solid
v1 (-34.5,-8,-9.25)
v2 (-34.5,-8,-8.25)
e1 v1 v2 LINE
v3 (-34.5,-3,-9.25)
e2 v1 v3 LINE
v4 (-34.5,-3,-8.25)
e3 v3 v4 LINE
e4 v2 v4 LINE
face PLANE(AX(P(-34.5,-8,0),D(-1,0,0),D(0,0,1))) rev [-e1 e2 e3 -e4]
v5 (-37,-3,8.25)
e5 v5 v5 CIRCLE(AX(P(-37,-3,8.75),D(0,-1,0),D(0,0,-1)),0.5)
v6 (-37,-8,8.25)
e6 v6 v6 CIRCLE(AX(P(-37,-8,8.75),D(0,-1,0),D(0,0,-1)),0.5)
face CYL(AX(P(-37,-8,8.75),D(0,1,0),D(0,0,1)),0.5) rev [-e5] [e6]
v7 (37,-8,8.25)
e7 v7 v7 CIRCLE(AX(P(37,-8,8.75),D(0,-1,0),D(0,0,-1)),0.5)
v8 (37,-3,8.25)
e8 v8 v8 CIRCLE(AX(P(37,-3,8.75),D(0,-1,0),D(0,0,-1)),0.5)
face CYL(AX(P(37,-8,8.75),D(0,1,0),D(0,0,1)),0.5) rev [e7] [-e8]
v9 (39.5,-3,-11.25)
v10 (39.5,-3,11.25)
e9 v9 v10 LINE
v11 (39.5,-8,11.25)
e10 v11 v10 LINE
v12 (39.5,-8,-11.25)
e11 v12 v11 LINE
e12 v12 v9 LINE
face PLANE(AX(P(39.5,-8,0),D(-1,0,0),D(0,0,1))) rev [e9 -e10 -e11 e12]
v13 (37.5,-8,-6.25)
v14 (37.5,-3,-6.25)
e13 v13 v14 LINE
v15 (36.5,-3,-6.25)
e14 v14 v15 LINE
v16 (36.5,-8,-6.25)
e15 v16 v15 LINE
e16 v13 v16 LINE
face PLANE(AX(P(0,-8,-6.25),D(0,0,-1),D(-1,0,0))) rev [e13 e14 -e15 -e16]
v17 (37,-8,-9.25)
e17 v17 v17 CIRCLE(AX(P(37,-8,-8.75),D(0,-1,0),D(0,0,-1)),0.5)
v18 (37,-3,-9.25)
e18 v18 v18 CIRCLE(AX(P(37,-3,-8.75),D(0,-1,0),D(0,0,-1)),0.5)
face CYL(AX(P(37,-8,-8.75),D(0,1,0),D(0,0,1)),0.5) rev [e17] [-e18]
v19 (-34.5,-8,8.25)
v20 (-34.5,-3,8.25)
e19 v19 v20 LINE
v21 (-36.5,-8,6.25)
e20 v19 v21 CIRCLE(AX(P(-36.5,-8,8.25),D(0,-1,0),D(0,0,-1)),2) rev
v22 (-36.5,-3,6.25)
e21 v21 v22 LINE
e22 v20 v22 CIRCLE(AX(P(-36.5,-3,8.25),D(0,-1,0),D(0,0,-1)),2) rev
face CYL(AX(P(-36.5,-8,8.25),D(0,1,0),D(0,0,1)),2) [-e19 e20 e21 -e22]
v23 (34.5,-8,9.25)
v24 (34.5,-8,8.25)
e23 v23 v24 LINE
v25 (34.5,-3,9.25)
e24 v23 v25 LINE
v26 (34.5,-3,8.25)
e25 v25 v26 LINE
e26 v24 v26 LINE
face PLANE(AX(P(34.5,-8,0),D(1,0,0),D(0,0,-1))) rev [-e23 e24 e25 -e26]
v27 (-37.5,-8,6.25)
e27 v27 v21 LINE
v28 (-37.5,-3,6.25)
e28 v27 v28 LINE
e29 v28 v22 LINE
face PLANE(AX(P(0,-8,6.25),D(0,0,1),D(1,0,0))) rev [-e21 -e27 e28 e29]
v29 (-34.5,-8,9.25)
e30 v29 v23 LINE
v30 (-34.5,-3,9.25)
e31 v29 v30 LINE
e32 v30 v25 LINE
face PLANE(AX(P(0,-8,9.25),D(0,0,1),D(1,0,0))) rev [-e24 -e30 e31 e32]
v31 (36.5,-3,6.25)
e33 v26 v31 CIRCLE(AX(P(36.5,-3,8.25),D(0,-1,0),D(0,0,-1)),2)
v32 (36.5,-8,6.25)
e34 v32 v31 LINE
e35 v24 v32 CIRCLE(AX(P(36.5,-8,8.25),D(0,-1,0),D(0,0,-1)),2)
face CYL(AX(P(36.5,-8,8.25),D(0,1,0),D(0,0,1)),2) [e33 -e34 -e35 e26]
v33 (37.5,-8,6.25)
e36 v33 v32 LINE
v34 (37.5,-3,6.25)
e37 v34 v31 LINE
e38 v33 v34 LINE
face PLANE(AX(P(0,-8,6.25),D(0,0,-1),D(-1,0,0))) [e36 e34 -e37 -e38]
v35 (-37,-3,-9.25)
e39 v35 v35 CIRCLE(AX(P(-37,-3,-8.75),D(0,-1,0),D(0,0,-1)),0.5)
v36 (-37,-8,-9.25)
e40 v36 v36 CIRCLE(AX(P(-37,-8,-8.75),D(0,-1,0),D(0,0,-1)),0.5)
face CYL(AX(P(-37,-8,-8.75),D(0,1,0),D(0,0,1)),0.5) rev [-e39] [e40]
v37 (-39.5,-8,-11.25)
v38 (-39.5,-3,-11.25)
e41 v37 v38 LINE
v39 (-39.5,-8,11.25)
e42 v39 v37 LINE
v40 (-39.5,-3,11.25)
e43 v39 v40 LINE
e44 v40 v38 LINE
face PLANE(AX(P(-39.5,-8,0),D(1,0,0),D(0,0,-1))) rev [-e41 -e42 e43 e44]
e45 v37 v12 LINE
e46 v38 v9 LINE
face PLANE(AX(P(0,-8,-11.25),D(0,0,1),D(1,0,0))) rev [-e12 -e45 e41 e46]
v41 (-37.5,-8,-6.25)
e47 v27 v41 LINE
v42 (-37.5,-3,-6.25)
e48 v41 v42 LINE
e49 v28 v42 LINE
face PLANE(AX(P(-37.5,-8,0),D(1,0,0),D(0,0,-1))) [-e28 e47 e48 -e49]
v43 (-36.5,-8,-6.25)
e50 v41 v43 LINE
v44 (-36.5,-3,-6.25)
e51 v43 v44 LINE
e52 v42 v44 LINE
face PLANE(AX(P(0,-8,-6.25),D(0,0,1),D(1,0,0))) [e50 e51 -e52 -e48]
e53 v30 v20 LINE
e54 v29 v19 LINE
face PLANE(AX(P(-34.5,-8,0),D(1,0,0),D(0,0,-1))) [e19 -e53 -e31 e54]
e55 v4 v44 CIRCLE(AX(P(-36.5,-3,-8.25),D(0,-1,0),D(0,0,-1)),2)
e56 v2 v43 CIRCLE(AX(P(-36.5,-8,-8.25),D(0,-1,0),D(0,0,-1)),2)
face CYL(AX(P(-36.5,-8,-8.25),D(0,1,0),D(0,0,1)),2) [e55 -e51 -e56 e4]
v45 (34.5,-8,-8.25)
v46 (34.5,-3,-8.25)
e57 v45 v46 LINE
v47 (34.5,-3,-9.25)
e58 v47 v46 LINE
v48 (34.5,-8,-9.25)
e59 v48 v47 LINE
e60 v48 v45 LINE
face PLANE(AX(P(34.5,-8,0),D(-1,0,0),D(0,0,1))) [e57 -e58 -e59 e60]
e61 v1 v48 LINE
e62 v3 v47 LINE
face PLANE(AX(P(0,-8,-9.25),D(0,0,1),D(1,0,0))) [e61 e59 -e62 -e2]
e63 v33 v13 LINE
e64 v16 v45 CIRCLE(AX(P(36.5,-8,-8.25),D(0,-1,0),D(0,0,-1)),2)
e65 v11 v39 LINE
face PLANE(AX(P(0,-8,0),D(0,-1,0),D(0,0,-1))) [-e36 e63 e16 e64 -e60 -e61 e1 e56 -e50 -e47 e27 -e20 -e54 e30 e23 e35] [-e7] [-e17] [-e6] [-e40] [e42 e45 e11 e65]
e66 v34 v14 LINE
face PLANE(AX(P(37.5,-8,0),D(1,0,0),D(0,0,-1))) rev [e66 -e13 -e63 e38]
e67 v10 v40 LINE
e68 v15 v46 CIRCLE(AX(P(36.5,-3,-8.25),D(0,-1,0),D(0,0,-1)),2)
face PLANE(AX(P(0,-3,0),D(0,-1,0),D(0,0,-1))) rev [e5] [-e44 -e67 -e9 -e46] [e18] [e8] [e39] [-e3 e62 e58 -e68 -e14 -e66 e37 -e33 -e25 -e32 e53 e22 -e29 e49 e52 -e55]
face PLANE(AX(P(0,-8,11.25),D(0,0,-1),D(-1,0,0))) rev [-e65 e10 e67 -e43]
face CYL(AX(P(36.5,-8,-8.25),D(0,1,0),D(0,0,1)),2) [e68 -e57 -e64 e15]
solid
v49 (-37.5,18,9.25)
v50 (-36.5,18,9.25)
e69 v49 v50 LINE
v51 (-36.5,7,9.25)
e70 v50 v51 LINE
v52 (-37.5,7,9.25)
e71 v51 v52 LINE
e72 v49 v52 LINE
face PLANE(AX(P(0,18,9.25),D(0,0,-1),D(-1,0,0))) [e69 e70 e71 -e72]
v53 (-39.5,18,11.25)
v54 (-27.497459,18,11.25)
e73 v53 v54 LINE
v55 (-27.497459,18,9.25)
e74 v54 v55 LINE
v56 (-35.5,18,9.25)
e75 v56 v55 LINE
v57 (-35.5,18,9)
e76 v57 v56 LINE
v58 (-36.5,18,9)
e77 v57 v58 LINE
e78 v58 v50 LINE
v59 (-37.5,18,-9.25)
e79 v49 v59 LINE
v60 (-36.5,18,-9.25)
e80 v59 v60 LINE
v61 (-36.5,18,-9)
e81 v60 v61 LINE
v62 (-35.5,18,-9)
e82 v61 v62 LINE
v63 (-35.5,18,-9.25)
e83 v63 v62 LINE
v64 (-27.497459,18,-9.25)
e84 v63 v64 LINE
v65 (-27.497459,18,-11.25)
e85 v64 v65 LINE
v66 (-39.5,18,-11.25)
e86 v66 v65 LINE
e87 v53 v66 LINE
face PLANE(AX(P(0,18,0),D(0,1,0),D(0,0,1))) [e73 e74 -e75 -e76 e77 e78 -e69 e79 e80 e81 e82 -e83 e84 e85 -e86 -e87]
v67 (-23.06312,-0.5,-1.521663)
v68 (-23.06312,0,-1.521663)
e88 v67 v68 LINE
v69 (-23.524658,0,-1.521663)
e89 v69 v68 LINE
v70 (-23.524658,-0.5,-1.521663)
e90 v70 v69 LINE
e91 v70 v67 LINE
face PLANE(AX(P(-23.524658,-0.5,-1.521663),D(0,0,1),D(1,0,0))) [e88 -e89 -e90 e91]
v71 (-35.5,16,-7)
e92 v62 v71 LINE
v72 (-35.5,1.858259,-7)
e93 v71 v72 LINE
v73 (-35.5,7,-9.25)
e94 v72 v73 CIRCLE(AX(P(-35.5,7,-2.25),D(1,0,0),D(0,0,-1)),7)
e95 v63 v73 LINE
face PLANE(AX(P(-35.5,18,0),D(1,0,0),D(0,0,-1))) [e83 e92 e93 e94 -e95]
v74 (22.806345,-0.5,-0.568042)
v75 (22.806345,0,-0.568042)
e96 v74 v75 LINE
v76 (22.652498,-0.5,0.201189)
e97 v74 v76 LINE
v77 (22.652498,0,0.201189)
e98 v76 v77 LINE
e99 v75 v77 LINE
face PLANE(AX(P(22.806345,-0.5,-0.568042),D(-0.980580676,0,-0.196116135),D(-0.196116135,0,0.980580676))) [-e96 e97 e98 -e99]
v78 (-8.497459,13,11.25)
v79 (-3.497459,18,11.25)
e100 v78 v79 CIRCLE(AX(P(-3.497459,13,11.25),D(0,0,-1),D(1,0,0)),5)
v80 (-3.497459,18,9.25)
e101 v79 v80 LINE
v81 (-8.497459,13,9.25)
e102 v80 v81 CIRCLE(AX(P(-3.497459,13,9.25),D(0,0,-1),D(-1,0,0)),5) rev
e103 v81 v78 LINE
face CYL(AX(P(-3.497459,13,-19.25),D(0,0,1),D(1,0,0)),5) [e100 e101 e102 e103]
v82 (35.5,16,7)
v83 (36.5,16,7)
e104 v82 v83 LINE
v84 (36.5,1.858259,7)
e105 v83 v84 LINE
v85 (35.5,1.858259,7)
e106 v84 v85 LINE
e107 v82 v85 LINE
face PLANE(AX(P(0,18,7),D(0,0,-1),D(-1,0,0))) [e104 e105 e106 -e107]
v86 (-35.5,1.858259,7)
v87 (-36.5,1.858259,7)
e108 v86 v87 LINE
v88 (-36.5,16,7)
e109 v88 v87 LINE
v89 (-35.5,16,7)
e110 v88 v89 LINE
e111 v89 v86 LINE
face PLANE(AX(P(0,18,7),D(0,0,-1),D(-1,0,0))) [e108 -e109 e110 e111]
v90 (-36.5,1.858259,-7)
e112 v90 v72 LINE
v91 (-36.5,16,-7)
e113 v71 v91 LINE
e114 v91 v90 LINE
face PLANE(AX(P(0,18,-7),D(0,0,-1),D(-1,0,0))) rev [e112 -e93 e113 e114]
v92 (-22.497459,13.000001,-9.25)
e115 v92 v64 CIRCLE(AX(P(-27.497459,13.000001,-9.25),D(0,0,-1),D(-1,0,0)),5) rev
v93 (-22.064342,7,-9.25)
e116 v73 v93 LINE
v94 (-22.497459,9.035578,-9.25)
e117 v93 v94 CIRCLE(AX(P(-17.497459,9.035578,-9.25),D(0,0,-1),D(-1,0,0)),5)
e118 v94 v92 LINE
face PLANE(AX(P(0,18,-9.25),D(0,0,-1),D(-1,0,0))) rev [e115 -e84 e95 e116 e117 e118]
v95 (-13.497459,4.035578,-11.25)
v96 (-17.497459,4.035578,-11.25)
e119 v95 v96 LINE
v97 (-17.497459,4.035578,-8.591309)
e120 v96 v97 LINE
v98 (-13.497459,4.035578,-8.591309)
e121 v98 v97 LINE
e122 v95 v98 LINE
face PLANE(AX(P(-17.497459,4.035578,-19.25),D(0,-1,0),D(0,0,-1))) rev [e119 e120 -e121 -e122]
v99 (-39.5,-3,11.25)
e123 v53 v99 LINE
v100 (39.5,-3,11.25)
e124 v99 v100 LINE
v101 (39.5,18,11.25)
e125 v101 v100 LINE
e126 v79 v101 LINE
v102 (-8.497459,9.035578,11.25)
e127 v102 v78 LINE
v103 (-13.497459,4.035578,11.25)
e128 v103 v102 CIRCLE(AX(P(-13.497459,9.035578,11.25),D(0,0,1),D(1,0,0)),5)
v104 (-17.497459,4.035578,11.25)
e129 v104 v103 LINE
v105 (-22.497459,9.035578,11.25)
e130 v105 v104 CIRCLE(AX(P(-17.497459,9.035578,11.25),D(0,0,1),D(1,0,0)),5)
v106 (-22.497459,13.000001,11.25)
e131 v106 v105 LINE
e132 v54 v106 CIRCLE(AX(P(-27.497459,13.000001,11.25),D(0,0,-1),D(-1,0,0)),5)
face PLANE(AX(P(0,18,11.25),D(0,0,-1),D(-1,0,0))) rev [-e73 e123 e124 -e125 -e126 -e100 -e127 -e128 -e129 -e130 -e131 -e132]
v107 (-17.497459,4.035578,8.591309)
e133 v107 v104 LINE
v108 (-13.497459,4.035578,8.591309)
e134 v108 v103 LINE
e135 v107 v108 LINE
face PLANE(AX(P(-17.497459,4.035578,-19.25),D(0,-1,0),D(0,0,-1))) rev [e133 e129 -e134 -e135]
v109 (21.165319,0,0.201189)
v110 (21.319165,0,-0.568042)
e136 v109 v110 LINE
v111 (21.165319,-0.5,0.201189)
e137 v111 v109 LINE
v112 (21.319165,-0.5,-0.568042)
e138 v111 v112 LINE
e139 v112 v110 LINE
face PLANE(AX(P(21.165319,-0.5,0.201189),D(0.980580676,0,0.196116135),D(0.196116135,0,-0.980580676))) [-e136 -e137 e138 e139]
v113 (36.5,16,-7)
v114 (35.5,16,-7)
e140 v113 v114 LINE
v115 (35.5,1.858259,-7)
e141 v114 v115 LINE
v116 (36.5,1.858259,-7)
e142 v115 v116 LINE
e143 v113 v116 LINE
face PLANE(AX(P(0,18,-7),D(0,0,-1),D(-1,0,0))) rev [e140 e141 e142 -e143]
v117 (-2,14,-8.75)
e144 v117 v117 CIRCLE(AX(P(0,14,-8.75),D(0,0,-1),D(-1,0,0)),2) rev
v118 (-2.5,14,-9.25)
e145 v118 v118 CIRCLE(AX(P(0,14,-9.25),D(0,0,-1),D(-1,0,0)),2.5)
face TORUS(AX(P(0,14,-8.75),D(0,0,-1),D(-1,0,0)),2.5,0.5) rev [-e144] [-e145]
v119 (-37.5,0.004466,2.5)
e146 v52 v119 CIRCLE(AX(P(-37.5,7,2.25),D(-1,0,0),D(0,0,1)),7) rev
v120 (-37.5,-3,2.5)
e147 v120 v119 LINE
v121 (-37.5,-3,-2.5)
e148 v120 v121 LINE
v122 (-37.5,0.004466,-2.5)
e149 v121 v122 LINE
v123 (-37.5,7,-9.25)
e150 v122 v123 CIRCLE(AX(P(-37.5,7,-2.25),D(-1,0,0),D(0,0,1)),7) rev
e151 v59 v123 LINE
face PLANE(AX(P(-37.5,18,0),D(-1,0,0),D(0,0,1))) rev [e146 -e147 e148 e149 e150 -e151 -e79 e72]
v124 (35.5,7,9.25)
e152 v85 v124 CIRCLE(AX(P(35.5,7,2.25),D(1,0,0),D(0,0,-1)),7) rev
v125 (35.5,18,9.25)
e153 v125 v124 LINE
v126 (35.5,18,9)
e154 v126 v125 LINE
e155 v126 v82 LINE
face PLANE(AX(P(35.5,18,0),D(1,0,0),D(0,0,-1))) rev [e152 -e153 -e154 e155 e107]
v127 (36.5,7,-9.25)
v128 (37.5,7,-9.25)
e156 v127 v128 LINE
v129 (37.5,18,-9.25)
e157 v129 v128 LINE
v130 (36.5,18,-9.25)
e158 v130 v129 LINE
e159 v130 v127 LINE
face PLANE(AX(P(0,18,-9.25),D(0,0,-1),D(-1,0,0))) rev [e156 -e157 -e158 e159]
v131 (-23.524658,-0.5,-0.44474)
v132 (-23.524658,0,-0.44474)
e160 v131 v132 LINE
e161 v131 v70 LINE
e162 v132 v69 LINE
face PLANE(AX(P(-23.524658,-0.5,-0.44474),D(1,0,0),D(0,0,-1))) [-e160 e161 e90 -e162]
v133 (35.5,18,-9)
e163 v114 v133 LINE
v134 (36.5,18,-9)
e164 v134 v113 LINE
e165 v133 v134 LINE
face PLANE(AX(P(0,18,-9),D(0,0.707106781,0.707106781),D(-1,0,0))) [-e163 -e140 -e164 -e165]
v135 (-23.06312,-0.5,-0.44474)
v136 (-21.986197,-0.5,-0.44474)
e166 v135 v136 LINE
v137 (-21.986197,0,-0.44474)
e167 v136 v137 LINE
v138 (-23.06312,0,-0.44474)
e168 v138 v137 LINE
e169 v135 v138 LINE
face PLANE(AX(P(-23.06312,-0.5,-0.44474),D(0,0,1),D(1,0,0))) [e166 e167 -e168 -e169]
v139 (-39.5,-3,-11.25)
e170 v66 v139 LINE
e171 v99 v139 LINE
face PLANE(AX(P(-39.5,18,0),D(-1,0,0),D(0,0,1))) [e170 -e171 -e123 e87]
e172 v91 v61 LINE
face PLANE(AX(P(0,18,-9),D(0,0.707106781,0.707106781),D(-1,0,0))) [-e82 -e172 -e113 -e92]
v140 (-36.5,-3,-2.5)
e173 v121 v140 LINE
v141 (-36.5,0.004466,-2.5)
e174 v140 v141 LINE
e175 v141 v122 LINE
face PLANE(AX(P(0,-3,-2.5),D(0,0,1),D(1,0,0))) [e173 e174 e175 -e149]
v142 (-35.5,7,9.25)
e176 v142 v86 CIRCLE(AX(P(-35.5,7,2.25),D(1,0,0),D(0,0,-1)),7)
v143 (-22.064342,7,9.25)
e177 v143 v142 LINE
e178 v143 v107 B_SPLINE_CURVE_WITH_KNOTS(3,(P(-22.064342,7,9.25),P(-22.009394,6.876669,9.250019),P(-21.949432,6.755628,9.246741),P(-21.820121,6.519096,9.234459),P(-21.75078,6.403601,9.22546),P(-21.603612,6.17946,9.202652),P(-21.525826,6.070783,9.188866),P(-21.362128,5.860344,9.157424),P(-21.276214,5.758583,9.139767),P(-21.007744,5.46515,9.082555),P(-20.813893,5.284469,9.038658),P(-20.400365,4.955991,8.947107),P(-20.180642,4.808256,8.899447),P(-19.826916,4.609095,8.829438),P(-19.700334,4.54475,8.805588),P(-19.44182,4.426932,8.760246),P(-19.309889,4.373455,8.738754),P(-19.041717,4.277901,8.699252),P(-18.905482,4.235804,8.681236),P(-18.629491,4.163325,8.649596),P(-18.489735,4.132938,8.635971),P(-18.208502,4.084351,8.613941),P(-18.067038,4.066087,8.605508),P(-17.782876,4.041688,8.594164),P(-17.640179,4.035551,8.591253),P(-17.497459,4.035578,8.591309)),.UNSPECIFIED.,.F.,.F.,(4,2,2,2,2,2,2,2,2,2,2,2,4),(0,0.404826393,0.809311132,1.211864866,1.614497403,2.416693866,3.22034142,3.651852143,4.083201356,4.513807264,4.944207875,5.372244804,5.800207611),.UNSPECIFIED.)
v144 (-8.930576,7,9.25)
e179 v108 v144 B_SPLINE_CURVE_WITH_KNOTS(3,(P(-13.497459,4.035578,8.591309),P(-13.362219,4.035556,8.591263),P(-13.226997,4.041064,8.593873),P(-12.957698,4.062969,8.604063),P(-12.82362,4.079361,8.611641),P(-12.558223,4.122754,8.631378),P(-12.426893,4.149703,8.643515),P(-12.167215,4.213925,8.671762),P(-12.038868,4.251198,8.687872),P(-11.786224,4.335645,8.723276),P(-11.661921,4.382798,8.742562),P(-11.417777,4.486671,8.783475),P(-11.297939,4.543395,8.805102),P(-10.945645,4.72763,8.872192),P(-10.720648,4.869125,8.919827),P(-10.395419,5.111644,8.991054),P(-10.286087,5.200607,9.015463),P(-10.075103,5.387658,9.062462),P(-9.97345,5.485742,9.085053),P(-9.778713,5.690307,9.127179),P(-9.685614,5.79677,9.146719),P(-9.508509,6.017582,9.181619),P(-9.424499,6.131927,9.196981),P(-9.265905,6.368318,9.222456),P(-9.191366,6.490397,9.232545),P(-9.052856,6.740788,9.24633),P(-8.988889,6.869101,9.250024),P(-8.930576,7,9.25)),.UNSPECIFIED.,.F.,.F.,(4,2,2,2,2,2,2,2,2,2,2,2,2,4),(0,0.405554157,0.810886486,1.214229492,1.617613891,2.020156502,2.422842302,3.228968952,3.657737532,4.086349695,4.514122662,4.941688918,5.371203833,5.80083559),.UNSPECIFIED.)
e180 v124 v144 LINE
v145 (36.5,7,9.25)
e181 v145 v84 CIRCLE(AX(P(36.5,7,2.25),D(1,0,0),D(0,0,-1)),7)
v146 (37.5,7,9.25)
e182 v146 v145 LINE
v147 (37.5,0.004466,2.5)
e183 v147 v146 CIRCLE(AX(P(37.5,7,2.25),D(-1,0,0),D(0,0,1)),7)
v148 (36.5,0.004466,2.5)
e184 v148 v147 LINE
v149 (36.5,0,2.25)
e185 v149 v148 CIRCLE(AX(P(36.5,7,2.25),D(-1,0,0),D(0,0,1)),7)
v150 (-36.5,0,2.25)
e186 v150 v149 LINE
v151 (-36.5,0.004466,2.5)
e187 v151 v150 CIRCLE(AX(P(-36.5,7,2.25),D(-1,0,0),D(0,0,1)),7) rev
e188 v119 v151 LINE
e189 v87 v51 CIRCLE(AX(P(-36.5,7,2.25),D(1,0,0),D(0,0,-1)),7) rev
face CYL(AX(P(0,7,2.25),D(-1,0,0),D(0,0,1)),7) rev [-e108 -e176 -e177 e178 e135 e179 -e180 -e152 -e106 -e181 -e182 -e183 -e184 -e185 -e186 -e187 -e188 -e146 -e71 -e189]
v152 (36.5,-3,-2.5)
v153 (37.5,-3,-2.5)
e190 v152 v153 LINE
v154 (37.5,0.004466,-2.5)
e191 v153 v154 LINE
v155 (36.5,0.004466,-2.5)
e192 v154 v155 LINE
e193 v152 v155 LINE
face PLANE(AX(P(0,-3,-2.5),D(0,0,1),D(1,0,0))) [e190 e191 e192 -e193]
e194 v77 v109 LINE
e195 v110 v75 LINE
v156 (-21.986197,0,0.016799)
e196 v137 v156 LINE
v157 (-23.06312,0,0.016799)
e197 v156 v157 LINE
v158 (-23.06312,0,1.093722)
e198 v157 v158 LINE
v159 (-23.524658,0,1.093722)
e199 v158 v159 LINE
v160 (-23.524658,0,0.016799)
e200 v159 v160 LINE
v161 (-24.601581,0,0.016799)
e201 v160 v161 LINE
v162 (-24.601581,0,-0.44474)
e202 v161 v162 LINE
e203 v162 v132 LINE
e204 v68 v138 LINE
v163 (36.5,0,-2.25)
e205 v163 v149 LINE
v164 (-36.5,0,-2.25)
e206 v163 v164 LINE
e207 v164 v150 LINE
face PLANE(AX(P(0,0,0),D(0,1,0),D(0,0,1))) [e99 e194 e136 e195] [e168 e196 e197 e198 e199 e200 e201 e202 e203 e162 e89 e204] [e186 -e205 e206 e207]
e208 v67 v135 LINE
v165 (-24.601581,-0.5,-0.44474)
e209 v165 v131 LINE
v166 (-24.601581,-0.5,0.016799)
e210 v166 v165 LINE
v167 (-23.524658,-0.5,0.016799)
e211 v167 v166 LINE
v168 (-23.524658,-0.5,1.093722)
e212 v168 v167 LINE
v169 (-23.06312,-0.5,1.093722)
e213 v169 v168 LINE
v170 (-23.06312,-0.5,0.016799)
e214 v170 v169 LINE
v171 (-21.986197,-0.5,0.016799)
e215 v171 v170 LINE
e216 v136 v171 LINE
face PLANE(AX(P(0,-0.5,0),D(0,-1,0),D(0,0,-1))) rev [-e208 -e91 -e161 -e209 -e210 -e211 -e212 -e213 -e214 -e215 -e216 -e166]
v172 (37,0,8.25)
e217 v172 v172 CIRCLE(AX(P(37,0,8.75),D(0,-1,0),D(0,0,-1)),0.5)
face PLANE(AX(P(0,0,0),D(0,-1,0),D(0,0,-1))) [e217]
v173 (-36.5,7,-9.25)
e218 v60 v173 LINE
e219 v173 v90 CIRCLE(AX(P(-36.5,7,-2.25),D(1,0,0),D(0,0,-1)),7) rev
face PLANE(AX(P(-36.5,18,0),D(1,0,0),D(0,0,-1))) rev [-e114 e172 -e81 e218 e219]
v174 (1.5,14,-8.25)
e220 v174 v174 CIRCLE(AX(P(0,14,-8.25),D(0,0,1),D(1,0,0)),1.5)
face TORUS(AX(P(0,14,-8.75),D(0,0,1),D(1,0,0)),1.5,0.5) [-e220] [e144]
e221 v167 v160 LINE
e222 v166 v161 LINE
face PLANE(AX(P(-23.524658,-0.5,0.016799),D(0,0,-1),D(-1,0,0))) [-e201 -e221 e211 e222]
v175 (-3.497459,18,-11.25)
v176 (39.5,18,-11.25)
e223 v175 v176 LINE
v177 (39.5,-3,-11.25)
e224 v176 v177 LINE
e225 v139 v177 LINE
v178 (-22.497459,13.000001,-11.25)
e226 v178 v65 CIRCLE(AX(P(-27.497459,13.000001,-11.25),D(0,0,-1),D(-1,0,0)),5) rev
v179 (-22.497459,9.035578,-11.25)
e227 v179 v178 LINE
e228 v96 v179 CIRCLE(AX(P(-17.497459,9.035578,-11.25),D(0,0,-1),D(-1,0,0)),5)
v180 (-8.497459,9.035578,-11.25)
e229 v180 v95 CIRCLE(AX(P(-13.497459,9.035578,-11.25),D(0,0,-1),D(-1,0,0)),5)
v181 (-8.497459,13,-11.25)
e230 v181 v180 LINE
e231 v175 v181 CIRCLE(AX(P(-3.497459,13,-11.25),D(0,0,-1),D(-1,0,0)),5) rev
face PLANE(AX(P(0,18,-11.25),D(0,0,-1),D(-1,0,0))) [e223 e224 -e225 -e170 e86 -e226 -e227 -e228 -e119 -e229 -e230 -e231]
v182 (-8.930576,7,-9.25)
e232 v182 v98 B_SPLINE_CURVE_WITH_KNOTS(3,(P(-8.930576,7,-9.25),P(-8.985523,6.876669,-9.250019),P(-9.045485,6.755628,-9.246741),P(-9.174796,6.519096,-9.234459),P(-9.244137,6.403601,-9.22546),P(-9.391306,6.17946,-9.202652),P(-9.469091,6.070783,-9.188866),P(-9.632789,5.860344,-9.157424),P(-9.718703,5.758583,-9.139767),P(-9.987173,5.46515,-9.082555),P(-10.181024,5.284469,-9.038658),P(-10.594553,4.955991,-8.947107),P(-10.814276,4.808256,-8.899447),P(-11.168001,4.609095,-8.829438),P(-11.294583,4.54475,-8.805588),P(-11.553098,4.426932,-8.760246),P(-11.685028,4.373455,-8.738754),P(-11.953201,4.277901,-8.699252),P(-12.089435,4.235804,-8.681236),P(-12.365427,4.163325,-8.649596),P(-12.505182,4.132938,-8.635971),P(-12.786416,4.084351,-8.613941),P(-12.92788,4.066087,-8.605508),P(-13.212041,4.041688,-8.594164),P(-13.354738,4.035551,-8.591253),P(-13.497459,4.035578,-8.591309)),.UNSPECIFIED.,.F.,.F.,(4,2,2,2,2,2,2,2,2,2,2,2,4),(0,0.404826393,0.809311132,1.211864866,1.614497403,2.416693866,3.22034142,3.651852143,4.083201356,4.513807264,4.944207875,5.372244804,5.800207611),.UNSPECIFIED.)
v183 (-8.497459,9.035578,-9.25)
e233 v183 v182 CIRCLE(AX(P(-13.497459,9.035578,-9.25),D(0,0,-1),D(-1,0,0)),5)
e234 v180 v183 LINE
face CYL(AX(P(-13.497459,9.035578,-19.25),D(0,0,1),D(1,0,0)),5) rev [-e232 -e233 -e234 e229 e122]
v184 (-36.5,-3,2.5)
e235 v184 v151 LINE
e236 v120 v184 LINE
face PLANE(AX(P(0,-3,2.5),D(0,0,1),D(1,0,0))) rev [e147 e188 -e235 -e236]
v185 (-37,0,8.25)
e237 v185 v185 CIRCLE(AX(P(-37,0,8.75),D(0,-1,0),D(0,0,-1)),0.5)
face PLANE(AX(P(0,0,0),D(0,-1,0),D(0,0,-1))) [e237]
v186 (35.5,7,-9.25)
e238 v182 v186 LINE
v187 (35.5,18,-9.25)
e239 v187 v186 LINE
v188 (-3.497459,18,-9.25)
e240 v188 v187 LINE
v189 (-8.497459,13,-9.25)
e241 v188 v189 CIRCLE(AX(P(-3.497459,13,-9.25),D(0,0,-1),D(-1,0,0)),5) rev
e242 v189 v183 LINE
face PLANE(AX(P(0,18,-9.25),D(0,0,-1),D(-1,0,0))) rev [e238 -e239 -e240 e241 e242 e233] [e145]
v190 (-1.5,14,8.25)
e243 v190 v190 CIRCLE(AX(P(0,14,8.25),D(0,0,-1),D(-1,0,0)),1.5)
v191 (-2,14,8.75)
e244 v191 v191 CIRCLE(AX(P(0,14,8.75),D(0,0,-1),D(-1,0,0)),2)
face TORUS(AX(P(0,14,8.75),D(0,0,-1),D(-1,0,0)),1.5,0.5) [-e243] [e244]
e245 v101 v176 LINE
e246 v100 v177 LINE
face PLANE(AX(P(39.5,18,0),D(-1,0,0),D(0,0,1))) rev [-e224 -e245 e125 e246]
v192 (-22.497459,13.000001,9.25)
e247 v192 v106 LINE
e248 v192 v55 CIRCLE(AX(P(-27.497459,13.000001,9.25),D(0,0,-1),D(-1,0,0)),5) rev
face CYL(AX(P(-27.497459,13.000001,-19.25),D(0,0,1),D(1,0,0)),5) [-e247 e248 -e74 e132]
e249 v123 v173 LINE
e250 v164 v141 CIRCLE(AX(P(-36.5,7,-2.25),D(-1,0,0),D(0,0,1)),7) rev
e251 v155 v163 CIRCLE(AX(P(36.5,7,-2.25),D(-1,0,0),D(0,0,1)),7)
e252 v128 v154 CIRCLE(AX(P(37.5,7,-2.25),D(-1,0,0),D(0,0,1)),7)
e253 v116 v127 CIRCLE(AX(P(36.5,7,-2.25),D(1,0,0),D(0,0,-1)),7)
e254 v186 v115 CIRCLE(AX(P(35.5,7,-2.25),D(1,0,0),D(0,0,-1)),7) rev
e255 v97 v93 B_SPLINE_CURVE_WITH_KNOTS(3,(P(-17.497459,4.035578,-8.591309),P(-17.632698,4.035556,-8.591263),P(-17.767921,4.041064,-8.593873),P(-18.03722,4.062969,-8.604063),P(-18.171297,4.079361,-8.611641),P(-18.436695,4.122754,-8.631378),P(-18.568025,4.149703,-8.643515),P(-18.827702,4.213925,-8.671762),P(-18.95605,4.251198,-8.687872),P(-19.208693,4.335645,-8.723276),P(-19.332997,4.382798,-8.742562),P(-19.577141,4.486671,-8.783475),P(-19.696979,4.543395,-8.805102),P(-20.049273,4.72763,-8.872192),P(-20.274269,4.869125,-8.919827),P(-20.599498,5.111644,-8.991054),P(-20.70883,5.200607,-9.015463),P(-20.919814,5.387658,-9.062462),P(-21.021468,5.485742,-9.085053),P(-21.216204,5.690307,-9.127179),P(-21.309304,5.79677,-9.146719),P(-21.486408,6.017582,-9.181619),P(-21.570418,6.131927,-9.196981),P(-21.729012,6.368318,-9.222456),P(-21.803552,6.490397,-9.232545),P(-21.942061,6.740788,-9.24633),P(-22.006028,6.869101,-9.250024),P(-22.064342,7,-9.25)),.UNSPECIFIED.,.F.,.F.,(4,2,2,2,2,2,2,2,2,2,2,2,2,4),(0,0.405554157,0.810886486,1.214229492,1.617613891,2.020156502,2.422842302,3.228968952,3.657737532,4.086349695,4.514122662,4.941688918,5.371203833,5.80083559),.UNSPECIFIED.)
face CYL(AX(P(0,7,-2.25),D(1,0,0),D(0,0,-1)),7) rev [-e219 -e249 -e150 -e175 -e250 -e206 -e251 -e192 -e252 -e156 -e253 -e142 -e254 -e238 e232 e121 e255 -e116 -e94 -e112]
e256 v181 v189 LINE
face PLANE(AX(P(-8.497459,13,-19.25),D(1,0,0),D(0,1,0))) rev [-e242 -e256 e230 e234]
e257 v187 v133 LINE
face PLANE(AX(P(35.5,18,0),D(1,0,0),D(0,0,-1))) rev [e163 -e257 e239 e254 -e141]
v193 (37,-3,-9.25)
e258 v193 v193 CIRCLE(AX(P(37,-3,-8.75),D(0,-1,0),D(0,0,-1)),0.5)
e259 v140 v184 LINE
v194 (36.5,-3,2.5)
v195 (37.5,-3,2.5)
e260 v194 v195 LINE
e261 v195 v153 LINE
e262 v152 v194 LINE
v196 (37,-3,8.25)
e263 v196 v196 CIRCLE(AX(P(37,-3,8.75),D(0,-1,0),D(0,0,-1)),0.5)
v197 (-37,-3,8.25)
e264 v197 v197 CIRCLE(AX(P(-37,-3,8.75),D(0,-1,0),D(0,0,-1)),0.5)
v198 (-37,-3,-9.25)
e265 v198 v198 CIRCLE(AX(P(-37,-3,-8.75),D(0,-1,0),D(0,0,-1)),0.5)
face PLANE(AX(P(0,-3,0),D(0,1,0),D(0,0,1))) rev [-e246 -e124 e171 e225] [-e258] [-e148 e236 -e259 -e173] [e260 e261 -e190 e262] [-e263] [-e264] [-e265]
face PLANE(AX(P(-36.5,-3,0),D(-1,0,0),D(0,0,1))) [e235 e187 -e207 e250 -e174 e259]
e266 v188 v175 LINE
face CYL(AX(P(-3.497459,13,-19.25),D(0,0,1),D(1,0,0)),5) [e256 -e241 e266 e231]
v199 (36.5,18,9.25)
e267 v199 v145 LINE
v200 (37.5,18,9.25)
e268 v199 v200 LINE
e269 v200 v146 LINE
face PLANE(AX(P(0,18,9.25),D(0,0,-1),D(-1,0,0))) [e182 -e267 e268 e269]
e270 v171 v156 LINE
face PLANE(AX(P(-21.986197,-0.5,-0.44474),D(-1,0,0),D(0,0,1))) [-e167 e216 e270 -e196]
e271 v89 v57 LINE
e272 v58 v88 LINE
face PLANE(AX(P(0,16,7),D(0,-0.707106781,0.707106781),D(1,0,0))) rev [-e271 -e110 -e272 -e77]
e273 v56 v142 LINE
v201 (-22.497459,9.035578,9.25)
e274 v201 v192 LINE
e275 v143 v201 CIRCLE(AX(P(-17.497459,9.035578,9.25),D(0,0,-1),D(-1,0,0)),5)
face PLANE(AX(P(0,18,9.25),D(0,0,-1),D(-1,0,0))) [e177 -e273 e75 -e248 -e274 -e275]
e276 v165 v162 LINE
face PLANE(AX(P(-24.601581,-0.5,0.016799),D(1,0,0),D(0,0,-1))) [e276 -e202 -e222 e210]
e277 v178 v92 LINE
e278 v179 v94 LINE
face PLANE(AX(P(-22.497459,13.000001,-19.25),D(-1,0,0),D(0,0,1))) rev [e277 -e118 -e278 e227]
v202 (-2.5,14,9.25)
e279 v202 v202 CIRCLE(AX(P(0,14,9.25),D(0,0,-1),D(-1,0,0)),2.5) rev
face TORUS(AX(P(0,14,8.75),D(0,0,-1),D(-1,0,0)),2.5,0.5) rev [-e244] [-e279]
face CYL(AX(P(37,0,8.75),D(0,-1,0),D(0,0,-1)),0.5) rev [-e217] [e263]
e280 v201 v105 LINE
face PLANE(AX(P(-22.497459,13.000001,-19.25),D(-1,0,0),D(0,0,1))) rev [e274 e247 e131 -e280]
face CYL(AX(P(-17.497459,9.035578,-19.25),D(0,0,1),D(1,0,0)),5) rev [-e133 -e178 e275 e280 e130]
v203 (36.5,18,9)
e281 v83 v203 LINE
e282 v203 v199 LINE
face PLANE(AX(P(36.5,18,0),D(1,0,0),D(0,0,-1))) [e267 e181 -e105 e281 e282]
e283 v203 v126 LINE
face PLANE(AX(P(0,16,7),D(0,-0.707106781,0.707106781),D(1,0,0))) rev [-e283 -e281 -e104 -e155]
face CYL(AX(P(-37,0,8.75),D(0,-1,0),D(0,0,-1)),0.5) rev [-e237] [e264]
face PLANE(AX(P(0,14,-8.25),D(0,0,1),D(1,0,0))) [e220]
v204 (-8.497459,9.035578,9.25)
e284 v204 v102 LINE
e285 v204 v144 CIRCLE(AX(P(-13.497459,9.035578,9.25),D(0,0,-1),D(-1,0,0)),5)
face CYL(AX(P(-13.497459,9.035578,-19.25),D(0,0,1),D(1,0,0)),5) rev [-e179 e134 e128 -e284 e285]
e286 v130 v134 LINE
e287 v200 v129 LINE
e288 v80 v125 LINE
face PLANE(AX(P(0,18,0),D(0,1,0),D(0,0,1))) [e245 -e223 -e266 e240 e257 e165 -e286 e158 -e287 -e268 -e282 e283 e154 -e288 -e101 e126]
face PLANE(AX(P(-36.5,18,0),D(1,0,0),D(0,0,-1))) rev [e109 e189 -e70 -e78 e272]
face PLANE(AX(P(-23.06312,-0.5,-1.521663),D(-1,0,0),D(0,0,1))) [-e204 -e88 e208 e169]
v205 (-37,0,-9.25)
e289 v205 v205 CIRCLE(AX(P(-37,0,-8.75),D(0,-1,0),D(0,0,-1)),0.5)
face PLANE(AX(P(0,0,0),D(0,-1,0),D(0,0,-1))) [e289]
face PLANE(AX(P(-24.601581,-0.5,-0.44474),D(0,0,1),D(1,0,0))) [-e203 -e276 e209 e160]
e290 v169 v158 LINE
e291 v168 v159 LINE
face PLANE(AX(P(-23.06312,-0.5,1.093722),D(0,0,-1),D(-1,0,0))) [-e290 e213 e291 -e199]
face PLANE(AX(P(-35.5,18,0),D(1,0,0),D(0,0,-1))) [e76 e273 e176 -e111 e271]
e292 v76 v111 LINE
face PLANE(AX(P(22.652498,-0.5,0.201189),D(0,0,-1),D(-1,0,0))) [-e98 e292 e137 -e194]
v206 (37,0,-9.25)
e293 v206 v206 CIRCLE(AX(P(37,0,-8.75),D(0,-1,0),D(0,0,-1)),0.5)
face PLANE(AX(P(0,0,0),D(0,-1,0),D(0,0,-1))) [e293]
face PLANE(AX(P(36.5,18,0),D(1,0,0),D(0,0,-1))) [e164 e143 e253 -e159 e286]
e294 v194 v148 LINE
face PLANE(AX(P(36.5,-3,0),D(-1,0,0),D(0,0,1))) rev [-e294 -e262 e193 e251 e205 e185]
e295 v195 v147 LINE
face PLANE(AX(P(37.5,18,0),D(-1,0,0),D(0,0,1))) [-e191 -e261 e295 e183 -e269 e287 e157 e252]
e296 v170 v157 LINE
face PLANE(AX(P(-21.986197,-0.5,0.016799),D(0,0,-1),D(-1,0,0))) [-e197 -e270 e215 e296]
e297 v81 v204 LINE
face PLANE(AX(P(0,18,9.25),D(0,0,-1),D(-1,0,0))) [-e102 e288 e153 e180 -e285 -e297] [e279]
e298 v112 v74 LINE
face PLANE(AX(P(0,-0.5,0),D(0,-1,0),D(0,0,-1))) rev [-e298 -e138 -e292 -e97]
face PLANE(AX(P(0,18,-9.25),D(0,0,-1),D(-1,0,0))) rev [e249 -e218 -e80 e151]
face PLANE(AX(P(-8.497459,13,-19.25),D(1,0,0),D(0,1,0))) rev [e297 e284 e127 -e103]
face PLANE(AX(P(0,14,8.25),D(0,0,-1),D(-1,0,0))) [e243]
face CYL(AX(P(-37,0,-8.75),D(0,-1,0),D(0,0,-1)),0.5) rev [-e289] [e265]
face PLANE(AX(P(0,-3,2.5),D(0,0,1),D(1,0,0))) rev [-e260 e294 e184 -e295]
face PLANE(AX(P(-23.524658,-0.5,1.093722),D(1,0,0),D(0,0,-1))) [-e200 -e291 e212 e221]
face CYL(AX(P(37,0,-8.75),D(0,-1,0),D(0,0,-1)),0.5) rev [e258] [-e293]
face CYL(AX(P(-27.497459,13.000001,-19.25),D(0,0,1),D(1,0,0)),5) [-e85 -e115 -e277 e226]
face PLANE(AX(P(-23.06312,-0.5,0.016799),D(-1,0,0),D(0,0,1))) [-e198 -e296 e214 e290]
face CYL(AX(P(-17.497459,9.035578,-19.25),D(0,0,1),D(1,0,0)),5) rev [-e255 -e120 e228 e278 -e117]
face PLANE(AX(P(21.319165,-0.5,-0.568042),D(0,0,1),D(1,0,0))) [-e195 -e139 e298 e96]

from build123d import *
from OCP.BRepAlgoAPI import BRepAlgoAPI_Cut
from OCP.TopTools import TopTools_ListOfShape

# Parameters (mm, degrees)
SKETCH_1_W          = 79
SKETCH_1_H          = 22.5
SKETCH_1_W_2        = 75
SKETCH_1_H_2        = 18.5
SKETCH_1_W_3        = 1
SKETCH_1_H_3        = 2.25
EXTRUDE_1_DEPTH     = 18
SKETCH_1_4_W        = 79
SKETCH_1_4_H        = 22.5
SKETCH_1_4_W_2      = 75
SKETCH_1_4_H_2      = 18.5
SKETCH_1_4_W_3      = 1
SKETCH_1_4_H_3      = 2.25
EXTRUDE_2_DEPTH     = 3
FILLET_1_R          = 7
CUT_EXTRUDE_1_DEPTH = 0.5
CUT_EXTRUDE_2_DEPTH = 30.5
CHAMFER_1_SIZE      = 2
SKETCH_4_R          = 2
EXTRUDE_4_DEPTH     = 1
EXTRUDE_START       = 1
SKETCH_5_R          = 2
EXTRUDE_5_DEPTH     = 1
FILLET_3_R          = 0.5
SKETCH_6_R          = 0.5
SKETCH_6_W          = 69
SKETCH_6_H          = 2
EXTRUDE_6_DEPTH     = 5
SKETCH_6_3_R        = 0.5
CUT_EXTRUDE_3_DEPTH = 3


with BuildPart() as part:
    # Эскиз1 → Бобышка-Вытянуть1 (new body)
    # profile 1 of 5: a face of its own
    with BuildSketch(Plane(origin=(0, 0, 0), x_dir=(1, 0, 0), z_dir=(0, 1, 0))):
        Rectangle(SKETCH_1_W, SKETCH_1_H)
        Rectangle(SKETCH_1_W_2, SKETCH_1_H_2, mode=Mode.SUBTRACT)
    # profile 2 of 5: a face of its own
    with BuildSketch(Plane(origin=(0, 0, 0), x_dir=(1, 0, 0), z_dir=(0, 1, 0))):
        with Locations((-36, 8.125)):
            Rectangle(SKETCH_1_W_3, SKETCH_1_H_3)
    # profile 3 of 5: a face of its own
    with BuildSketch(Plane(origin=(0, 0, 0), x_dir=(1, 0, 0), z_dir=(0, 1, 0))):
        with Locations((-36, -8.125)):
            Rectangle(SKETCH_1_W_3, SKETCH_1_H_3)
    # profile 4 of 5: a face of its own
    with BuildSketch(Plane(origin=(0, 0, 0), x_dir=(1, 0, 0), z_dir=(0, 1, 0))):
        with Locations((36, 8.125)):
            Rectangle(SKETCH_1_W_3, SKETCH_1_H_3)
    # profile 5 of 5: a face of its own
    with BuildSketch(Plane(origin=(0, 0, 0), x_dir=(1, 0, 0), z_dir=(0, 1, 0))):
        with Locations((36, -8.125)):
            Rectangle(SKETCH_1_W_3, SKETCH_1_H_3)
    extrude(amount=EXTRUDE_1_DEPTH)

    # Эскиз1<4> → Бобышка-Вытянуть2 (add)
    # profile 1 of 6: a face of its own
    with BuildSketch(Plane(origin=(0, 0, 0), x_dir=(1, 0, 0), z_dir=(0, 1, 0))):
        Rectangle(SKETCH_1_4_W, SKETCH_1_4_H)
        Rectangle(SKETCH_1_4_W_2, SKETCH_1_4_H_2, mode=Mode.SUBTRACT)
    # profile 2 of 6: a face of its own
    with BuildSketch(Plane(origin=(0, 0, 0), x_dir=(1, 0, 0), z_dir=(0, 1, 0))):
        Polygon((37.5, 9.25), (36.5, 9.25), (36.5, 7), (35.5, 7), (35.5, 9.25), (-35.5, 9.25), (-35.5, 7), (-36.5, 7), (-36.5, 9.25), (-37.5, 9.25), (-37.5, 2.5), (-36.5, 2.5), (-36.5, -2.5), (-37.5, -2.5), (-37.5, -9.25), (-36.5, -9.25), (-36.5, -7), (-35.5, -7), (-35.5, -9.25), (35.5, -9.25), (35.5, -7), (36.5, -7), (36.5, -9.25), (37.5, -9.25), (37.5, -2.5), (36.5, -2.5), (36.5, 2.5), (37.5, 2.5), align=None)
    # profile 3 of 6: a face of its own
    with BuildSketch(Plane(origin=(0, 0, 0), x_dir=(1, 0, 0), z_dir=(0, 1, 0))):
        with Locations((-36, -8.125)):
            Rectangle(SKETCH_1_4_W_3, SKETCH_1_4_H_3)
    # profile 4 of 6: a face of its own
    with BuildSketch(Plane(origin=(0, 0, 0), x_dir=(1, 0, 0), z_dir=(0, 1, 0))):
        with Locations((-36, 8.125)):
            Rectangle(SKETCH_1_4_W_3, SKETCH_1_4_H_3)
    # profile 5 of 6: a face of its own
    with BuildSketch(Plane(origin=(0, 0, 0), x_dir=(1, 0, 0), z_dir=(0, 1, 0))):
        with Locations((36, -8.125)):
            Rectangle(SKETCH_1_4_W_3, SKETCH_1_4_H_3)
    # profile 6 of 6: a face of its own
    with BuildSketch(Plane(origin=(0, 0, 0), x_dir=(1, 0, 0), z_dir=(0, 1, 0))):
        with Locations((36, 8.125)):
            Rectangle(SKETCH_1_4_W_3, SKETCH_1_4_H_3)
    extrude(amount=-EXTRUDE_2_DEPTH)

    # Скругление1
    fillet_1_edges = [part.edges().sort_by_distance(p)[0] for p in [
        (0, 0, 9.25),
        (0, 0, -9.25),
    ]]
    fillet(fillet_1_edges, radius=FILLET_1_R)

    # Эскиз2 → Вырез-Вытянуть1 (cut)
    with BuildSketch(Plane(origin=(0, 0, 0), x_dir=(1, 0, 0), z_dir=(0, 1, 0))):
        Polygon((-23.524658225, -1.093721701), (-23.524658225, -0.016798624), (-24.601581301, -0.016798624), (-24.601581301, 0.444739838), (-23.524658225, 0.444739838), (-23.524658225, 1.521662915), (-23.063119763, 1.521662915), (-23.063119763, 0.444739838), (-21.986196686, 0.444739838), (-21.986196686, -0.016798624), (-23.063119763, -0.016798624), (-23.063119763, -1.093721701), align=None)
        Polygon((21.319165068, 0.568041922), (22.806344555, 0.568041922), (22.652498401, -0.201188847), (21.165318914, -0.201188847), align=None)
    extrude(amount=-CUT_EXTRUDE_1_DEPTH, mode=Mode.SUBTRACT)


with BuildPart() as cut_extrude_2_tool:
    # Эскиз3 → Вырез-Вытянуть2 (new body)
    with BuildSketch(Plane.XY.offset(11.25)):
        with BuildLine():
            Line((-21.5, 18), (-8.5, 18))
            Line((-8.5, 18), (-3.4974587, 18))
            ThreePointArc((-3.4974587, 18), (-7.032992606, 16.535533906), (-8.4974587, 13))
            Line((-8.4974587, 13), (-8.4974587, 9.035578202))
            ThreePointArc((-8.4974587, 9.035578202), (-9.961924794, 5.500044296), (-13.4974587, 4.035578202))
            Line((-13.4974587, 4.035578202), (-17.4974587, 4.035578202))
            ThreePointArc((-17.4974587, 4.035578202), (-21.032992606, 5.500044296), (-22.4974587, 9.035578202))
            Line((-22.4974587, 9.035578202), (-22.4974587, 13.000000646))
            ThreePointArc((-22.4974587, 13.000000646), (-23.962823393, 16.536432923), (-27.5, 18))
            Line((-27.5, 18), (-21.5, 18))
        make_face()
    extrude(amount=-CUT_EXTRUDE_2_DEPTH)


with BuildPart() as part_1:
    add(part.part)

    # Вырез-Вытянуть2: cut by cut_extrude_2_tool, with a tolerance
    cut_extrude_2_stock = TopTools_ListOfShape()
    cut_extrude_2_stock.Append(part_1.part.wrapped)
    cut_extrude_2_tools = TopTools_ListOfShape()
    cut_extrude_2_tools.Append(cut_extrude_2_tool.part.wrapped)
    cut_extrude_2_cut = BRepAlgoAPI_Cut()
    cut_extrude_2_cut.SetArguments(cut_extrude_2_stock)
    cut_extrude_2_cut.SetTools(cut_extrude_2_tools)
    cut_extrude_2_cut.SetFuzzyValue(0.00001)
    cut_extrude_2_cut.Build()
    add(Compound.cast(cut_extrude_2_cut.Shape()).solids(), mode=Mode.REPLACE)

    # Фаска1
    chamfer_1_edges = [part_1.edges().sort_by_distance(p)[0] for p in [
        (36, 18, -7),
        (36, 18, 7),
        (-36, 18, 7),
        (-36, 18, -7),
    ]]
    chamfer(chamfer_1_edges, length=CHAMFER_1_SIZE)

    # Эскиз4 → Бобышка-Вытянуть4 (add)
    with BuildSketch(Plane(origin=(0, 0, 9.25), x_dir=(-1, 0, 0), z_dir=(0, 0, -1))):
        with Locations((0, 14)):
            Circle(SKETCH_4_R)
    extrude(amount=EXTRUDE_4_DEPTH)

    # Эскиз5 → Бобышка-Вытянуть5 (add)
    with BuildSketch(Plane.XY.offset(-9.25).offset(EXTRUDE_START)):
        with Locations(Location((0, 14, 0), (0, 0, 180))):
            Circle(SKETCH_5_R)
    extrude(amount=-EXTRUDE_5_DEPTH)

    # Скругление3
    fillet_3_edges = [part_1.edges().sort_by_distance(p)[0] for p in [
        (2, 14, 9.25),
        (2, 14, 8.25),
        (2, 14, -9.25),
        (2, 14, -8.25),
    ]]
    fillet(fillet_3_edges, radius=FILLET_3_R - 0.0001)  # a hair under: the kernel refuses the full size

    # Эскиз6<3> → Вырез-Вытянуть3 (cut)
    with BuildSketch(Plane.XZ.offset(3)):
        with Locations(Location((-37, -8.75, 0), (0, 0, 270))):
            Circle(SKETCH_6_3_R)
        with Locations(Location((-37, 8.75, 0), (0, 0, 270))):
            Circle(SKETCH_6_3_R)
        with Locations(Location((37, -8.75, 0), (0, 0, 270))):
            Circle(SKETCH_6_3_R)
        with Locations(Location((37, 8.75, 0), (0, 0, 270))):
            Circle(SKETCH_6_3_R)
    extrude(amount=-CUT_EXTRUDE_3_DEPTH, mode=Mode.SUBTRACT)


with BuildPart() as body_2:
    # Эскиз6 → Бобышка-Вытянуть6 (new body)
    # profile 1 of 8: a face of its own
    with BuildSketch(Plane.XZ.offset(3)):
        with BuildLine():
            Line((-39.5, 6.25), (-37.5, 6.25))
            Line((-37.5, 6.25), (-36.5, 6.25))
            ThreePointArc((-36.5, 6.25), (-35.085786438, 6.835786438), (-34.5, 8.25))
            Line((-34.5, 8.25), (-34.5, 9.25))
            Line((-34.5, 9.25), (-34.5, 11.25))
            Line((-34.5, 11.25), (-39.5, 11.25))
            Line((-39.5, 11.25), (-39.5, 6.25))
        make_face()
        with Locations(Location((-37, 8.75, 0), (0, 0, 270))):
            Circle(SKETCH_6_R, mode=Mode.SUBTRACT)
    # profile 2 of 8: a face of its own
    with BuildSketch(Plane.XZ.offset(3)):
        with Locations((0, 10.25)):
            Rectangle(SKETCH_6_W, SKETCH_6_H)
    # profile 3 of 8: a face of its own
    with BuildSketch(Plane.XZ.offset(3)):
        Polygon((-37.5, 2.5), (-37.5, 6.25), (-39.5, 6.25), (-39.5, -6.25), (-37.5, -6.25), (-37.5, -2.5), align=None)
    # profile 4 of 8: a face of its own
    with BuildSketch(Plane.XZ.offset(3)):
        with BuildLine():
            Line((-37.5, -6.25), (-39.5, -6.25))
            Line((-39.5, -6.25), (-39.5, -11.25))
            Line((-39.5, -11.25), (-34.5, -11.25))
            Line((-34.5, -11.25), (-34.5, -9.25))
            Line((-34.5, -9.25), (-34.5, -8.25))
            ThreePointArc((-34.5, -8.25), (-35.085786438, -6.835786438), (-36.5, -6.25))
            Line((-36.5, -6.25), (-37.5, -6.25))
        make_face()
        with Locations(Location((-37, -8.75, 0), (0, 0, 270))):
            Circle(SKETCH_6_R, mode=Mode.SUBTRACT)
    # profile 5 of 8: a face of its own
    with BuildSketch(Plane.XZ.offset(3)):
        with Locations((0, -10.25)):
            Rectangle(SKETCH_6_W, SKETCH_6_H)
    # profile 6 of 8: a face of its own
    with BuildSketch(Plane.XZ.offset(3)):
        with BuildLine():
            Line((39.5, 11.25), (34.5, 11.25))
            Line((34.5, 11.25), (34.5, 9.25))
            Line((34.5, 9.25), (34.5, 8.25))
            ThreePointArc((34.5, 8.25), (35.085786438, 6.835786438), (36.5, 6.25))
            Line((36.5, 6.25), (37.5, 6.25))
            Line((37.5, 6.25), (39.5, 6.25))
            Line((39.5, 6.25), (39.5, 11.25))
        make_face()
        with Locations(Location((37, 8.75, 0), (0, 0, 270))):
            Circle(SKETCH_6_R, mode=Mode.SUBTRACT)
    # profile 7 of 8: a face of its own
    with BuildSketch(Plane.XZ.offset(3)):
        Polygon((39.5, -6.25), (39.5, 6.25), (37.5, 6.25), (37.5, 2.5), (37.5, -2.5), (37.5, -6.25), align=None)
    # profile 8 of 8: a face of its own
    with BuildSketch(Plane.XZ.offset(3)):
        with BuildLine():
            Line((34.5, -9.25), (34.5, -11.25))
            Line((34.5, -11.25), (39.5, -11.25))
            Line((39.5, -11.25), (39.5, -6.25))
            Line((39.5, -6.25), (37.5, -6.25))
            Line((37.5, -6.25), (36.5, -6.25))
            ThreePointArc((36.5, -6.25), (35.085786438, -6.835786438), (34.5, -8.25))
            Line((34.5, -8.25), (34.5, -9.25))
        make_face()
        with Locations(Location((37, -8.75, 0), (0, 0, 270))):
            Circle(SKETCH_6_R, mode=Mode.SUBTRACT)
    extrude(amount=EXTRUDE_6_DEPTH)


solid = Compound([part_1.part, body_2.part])
